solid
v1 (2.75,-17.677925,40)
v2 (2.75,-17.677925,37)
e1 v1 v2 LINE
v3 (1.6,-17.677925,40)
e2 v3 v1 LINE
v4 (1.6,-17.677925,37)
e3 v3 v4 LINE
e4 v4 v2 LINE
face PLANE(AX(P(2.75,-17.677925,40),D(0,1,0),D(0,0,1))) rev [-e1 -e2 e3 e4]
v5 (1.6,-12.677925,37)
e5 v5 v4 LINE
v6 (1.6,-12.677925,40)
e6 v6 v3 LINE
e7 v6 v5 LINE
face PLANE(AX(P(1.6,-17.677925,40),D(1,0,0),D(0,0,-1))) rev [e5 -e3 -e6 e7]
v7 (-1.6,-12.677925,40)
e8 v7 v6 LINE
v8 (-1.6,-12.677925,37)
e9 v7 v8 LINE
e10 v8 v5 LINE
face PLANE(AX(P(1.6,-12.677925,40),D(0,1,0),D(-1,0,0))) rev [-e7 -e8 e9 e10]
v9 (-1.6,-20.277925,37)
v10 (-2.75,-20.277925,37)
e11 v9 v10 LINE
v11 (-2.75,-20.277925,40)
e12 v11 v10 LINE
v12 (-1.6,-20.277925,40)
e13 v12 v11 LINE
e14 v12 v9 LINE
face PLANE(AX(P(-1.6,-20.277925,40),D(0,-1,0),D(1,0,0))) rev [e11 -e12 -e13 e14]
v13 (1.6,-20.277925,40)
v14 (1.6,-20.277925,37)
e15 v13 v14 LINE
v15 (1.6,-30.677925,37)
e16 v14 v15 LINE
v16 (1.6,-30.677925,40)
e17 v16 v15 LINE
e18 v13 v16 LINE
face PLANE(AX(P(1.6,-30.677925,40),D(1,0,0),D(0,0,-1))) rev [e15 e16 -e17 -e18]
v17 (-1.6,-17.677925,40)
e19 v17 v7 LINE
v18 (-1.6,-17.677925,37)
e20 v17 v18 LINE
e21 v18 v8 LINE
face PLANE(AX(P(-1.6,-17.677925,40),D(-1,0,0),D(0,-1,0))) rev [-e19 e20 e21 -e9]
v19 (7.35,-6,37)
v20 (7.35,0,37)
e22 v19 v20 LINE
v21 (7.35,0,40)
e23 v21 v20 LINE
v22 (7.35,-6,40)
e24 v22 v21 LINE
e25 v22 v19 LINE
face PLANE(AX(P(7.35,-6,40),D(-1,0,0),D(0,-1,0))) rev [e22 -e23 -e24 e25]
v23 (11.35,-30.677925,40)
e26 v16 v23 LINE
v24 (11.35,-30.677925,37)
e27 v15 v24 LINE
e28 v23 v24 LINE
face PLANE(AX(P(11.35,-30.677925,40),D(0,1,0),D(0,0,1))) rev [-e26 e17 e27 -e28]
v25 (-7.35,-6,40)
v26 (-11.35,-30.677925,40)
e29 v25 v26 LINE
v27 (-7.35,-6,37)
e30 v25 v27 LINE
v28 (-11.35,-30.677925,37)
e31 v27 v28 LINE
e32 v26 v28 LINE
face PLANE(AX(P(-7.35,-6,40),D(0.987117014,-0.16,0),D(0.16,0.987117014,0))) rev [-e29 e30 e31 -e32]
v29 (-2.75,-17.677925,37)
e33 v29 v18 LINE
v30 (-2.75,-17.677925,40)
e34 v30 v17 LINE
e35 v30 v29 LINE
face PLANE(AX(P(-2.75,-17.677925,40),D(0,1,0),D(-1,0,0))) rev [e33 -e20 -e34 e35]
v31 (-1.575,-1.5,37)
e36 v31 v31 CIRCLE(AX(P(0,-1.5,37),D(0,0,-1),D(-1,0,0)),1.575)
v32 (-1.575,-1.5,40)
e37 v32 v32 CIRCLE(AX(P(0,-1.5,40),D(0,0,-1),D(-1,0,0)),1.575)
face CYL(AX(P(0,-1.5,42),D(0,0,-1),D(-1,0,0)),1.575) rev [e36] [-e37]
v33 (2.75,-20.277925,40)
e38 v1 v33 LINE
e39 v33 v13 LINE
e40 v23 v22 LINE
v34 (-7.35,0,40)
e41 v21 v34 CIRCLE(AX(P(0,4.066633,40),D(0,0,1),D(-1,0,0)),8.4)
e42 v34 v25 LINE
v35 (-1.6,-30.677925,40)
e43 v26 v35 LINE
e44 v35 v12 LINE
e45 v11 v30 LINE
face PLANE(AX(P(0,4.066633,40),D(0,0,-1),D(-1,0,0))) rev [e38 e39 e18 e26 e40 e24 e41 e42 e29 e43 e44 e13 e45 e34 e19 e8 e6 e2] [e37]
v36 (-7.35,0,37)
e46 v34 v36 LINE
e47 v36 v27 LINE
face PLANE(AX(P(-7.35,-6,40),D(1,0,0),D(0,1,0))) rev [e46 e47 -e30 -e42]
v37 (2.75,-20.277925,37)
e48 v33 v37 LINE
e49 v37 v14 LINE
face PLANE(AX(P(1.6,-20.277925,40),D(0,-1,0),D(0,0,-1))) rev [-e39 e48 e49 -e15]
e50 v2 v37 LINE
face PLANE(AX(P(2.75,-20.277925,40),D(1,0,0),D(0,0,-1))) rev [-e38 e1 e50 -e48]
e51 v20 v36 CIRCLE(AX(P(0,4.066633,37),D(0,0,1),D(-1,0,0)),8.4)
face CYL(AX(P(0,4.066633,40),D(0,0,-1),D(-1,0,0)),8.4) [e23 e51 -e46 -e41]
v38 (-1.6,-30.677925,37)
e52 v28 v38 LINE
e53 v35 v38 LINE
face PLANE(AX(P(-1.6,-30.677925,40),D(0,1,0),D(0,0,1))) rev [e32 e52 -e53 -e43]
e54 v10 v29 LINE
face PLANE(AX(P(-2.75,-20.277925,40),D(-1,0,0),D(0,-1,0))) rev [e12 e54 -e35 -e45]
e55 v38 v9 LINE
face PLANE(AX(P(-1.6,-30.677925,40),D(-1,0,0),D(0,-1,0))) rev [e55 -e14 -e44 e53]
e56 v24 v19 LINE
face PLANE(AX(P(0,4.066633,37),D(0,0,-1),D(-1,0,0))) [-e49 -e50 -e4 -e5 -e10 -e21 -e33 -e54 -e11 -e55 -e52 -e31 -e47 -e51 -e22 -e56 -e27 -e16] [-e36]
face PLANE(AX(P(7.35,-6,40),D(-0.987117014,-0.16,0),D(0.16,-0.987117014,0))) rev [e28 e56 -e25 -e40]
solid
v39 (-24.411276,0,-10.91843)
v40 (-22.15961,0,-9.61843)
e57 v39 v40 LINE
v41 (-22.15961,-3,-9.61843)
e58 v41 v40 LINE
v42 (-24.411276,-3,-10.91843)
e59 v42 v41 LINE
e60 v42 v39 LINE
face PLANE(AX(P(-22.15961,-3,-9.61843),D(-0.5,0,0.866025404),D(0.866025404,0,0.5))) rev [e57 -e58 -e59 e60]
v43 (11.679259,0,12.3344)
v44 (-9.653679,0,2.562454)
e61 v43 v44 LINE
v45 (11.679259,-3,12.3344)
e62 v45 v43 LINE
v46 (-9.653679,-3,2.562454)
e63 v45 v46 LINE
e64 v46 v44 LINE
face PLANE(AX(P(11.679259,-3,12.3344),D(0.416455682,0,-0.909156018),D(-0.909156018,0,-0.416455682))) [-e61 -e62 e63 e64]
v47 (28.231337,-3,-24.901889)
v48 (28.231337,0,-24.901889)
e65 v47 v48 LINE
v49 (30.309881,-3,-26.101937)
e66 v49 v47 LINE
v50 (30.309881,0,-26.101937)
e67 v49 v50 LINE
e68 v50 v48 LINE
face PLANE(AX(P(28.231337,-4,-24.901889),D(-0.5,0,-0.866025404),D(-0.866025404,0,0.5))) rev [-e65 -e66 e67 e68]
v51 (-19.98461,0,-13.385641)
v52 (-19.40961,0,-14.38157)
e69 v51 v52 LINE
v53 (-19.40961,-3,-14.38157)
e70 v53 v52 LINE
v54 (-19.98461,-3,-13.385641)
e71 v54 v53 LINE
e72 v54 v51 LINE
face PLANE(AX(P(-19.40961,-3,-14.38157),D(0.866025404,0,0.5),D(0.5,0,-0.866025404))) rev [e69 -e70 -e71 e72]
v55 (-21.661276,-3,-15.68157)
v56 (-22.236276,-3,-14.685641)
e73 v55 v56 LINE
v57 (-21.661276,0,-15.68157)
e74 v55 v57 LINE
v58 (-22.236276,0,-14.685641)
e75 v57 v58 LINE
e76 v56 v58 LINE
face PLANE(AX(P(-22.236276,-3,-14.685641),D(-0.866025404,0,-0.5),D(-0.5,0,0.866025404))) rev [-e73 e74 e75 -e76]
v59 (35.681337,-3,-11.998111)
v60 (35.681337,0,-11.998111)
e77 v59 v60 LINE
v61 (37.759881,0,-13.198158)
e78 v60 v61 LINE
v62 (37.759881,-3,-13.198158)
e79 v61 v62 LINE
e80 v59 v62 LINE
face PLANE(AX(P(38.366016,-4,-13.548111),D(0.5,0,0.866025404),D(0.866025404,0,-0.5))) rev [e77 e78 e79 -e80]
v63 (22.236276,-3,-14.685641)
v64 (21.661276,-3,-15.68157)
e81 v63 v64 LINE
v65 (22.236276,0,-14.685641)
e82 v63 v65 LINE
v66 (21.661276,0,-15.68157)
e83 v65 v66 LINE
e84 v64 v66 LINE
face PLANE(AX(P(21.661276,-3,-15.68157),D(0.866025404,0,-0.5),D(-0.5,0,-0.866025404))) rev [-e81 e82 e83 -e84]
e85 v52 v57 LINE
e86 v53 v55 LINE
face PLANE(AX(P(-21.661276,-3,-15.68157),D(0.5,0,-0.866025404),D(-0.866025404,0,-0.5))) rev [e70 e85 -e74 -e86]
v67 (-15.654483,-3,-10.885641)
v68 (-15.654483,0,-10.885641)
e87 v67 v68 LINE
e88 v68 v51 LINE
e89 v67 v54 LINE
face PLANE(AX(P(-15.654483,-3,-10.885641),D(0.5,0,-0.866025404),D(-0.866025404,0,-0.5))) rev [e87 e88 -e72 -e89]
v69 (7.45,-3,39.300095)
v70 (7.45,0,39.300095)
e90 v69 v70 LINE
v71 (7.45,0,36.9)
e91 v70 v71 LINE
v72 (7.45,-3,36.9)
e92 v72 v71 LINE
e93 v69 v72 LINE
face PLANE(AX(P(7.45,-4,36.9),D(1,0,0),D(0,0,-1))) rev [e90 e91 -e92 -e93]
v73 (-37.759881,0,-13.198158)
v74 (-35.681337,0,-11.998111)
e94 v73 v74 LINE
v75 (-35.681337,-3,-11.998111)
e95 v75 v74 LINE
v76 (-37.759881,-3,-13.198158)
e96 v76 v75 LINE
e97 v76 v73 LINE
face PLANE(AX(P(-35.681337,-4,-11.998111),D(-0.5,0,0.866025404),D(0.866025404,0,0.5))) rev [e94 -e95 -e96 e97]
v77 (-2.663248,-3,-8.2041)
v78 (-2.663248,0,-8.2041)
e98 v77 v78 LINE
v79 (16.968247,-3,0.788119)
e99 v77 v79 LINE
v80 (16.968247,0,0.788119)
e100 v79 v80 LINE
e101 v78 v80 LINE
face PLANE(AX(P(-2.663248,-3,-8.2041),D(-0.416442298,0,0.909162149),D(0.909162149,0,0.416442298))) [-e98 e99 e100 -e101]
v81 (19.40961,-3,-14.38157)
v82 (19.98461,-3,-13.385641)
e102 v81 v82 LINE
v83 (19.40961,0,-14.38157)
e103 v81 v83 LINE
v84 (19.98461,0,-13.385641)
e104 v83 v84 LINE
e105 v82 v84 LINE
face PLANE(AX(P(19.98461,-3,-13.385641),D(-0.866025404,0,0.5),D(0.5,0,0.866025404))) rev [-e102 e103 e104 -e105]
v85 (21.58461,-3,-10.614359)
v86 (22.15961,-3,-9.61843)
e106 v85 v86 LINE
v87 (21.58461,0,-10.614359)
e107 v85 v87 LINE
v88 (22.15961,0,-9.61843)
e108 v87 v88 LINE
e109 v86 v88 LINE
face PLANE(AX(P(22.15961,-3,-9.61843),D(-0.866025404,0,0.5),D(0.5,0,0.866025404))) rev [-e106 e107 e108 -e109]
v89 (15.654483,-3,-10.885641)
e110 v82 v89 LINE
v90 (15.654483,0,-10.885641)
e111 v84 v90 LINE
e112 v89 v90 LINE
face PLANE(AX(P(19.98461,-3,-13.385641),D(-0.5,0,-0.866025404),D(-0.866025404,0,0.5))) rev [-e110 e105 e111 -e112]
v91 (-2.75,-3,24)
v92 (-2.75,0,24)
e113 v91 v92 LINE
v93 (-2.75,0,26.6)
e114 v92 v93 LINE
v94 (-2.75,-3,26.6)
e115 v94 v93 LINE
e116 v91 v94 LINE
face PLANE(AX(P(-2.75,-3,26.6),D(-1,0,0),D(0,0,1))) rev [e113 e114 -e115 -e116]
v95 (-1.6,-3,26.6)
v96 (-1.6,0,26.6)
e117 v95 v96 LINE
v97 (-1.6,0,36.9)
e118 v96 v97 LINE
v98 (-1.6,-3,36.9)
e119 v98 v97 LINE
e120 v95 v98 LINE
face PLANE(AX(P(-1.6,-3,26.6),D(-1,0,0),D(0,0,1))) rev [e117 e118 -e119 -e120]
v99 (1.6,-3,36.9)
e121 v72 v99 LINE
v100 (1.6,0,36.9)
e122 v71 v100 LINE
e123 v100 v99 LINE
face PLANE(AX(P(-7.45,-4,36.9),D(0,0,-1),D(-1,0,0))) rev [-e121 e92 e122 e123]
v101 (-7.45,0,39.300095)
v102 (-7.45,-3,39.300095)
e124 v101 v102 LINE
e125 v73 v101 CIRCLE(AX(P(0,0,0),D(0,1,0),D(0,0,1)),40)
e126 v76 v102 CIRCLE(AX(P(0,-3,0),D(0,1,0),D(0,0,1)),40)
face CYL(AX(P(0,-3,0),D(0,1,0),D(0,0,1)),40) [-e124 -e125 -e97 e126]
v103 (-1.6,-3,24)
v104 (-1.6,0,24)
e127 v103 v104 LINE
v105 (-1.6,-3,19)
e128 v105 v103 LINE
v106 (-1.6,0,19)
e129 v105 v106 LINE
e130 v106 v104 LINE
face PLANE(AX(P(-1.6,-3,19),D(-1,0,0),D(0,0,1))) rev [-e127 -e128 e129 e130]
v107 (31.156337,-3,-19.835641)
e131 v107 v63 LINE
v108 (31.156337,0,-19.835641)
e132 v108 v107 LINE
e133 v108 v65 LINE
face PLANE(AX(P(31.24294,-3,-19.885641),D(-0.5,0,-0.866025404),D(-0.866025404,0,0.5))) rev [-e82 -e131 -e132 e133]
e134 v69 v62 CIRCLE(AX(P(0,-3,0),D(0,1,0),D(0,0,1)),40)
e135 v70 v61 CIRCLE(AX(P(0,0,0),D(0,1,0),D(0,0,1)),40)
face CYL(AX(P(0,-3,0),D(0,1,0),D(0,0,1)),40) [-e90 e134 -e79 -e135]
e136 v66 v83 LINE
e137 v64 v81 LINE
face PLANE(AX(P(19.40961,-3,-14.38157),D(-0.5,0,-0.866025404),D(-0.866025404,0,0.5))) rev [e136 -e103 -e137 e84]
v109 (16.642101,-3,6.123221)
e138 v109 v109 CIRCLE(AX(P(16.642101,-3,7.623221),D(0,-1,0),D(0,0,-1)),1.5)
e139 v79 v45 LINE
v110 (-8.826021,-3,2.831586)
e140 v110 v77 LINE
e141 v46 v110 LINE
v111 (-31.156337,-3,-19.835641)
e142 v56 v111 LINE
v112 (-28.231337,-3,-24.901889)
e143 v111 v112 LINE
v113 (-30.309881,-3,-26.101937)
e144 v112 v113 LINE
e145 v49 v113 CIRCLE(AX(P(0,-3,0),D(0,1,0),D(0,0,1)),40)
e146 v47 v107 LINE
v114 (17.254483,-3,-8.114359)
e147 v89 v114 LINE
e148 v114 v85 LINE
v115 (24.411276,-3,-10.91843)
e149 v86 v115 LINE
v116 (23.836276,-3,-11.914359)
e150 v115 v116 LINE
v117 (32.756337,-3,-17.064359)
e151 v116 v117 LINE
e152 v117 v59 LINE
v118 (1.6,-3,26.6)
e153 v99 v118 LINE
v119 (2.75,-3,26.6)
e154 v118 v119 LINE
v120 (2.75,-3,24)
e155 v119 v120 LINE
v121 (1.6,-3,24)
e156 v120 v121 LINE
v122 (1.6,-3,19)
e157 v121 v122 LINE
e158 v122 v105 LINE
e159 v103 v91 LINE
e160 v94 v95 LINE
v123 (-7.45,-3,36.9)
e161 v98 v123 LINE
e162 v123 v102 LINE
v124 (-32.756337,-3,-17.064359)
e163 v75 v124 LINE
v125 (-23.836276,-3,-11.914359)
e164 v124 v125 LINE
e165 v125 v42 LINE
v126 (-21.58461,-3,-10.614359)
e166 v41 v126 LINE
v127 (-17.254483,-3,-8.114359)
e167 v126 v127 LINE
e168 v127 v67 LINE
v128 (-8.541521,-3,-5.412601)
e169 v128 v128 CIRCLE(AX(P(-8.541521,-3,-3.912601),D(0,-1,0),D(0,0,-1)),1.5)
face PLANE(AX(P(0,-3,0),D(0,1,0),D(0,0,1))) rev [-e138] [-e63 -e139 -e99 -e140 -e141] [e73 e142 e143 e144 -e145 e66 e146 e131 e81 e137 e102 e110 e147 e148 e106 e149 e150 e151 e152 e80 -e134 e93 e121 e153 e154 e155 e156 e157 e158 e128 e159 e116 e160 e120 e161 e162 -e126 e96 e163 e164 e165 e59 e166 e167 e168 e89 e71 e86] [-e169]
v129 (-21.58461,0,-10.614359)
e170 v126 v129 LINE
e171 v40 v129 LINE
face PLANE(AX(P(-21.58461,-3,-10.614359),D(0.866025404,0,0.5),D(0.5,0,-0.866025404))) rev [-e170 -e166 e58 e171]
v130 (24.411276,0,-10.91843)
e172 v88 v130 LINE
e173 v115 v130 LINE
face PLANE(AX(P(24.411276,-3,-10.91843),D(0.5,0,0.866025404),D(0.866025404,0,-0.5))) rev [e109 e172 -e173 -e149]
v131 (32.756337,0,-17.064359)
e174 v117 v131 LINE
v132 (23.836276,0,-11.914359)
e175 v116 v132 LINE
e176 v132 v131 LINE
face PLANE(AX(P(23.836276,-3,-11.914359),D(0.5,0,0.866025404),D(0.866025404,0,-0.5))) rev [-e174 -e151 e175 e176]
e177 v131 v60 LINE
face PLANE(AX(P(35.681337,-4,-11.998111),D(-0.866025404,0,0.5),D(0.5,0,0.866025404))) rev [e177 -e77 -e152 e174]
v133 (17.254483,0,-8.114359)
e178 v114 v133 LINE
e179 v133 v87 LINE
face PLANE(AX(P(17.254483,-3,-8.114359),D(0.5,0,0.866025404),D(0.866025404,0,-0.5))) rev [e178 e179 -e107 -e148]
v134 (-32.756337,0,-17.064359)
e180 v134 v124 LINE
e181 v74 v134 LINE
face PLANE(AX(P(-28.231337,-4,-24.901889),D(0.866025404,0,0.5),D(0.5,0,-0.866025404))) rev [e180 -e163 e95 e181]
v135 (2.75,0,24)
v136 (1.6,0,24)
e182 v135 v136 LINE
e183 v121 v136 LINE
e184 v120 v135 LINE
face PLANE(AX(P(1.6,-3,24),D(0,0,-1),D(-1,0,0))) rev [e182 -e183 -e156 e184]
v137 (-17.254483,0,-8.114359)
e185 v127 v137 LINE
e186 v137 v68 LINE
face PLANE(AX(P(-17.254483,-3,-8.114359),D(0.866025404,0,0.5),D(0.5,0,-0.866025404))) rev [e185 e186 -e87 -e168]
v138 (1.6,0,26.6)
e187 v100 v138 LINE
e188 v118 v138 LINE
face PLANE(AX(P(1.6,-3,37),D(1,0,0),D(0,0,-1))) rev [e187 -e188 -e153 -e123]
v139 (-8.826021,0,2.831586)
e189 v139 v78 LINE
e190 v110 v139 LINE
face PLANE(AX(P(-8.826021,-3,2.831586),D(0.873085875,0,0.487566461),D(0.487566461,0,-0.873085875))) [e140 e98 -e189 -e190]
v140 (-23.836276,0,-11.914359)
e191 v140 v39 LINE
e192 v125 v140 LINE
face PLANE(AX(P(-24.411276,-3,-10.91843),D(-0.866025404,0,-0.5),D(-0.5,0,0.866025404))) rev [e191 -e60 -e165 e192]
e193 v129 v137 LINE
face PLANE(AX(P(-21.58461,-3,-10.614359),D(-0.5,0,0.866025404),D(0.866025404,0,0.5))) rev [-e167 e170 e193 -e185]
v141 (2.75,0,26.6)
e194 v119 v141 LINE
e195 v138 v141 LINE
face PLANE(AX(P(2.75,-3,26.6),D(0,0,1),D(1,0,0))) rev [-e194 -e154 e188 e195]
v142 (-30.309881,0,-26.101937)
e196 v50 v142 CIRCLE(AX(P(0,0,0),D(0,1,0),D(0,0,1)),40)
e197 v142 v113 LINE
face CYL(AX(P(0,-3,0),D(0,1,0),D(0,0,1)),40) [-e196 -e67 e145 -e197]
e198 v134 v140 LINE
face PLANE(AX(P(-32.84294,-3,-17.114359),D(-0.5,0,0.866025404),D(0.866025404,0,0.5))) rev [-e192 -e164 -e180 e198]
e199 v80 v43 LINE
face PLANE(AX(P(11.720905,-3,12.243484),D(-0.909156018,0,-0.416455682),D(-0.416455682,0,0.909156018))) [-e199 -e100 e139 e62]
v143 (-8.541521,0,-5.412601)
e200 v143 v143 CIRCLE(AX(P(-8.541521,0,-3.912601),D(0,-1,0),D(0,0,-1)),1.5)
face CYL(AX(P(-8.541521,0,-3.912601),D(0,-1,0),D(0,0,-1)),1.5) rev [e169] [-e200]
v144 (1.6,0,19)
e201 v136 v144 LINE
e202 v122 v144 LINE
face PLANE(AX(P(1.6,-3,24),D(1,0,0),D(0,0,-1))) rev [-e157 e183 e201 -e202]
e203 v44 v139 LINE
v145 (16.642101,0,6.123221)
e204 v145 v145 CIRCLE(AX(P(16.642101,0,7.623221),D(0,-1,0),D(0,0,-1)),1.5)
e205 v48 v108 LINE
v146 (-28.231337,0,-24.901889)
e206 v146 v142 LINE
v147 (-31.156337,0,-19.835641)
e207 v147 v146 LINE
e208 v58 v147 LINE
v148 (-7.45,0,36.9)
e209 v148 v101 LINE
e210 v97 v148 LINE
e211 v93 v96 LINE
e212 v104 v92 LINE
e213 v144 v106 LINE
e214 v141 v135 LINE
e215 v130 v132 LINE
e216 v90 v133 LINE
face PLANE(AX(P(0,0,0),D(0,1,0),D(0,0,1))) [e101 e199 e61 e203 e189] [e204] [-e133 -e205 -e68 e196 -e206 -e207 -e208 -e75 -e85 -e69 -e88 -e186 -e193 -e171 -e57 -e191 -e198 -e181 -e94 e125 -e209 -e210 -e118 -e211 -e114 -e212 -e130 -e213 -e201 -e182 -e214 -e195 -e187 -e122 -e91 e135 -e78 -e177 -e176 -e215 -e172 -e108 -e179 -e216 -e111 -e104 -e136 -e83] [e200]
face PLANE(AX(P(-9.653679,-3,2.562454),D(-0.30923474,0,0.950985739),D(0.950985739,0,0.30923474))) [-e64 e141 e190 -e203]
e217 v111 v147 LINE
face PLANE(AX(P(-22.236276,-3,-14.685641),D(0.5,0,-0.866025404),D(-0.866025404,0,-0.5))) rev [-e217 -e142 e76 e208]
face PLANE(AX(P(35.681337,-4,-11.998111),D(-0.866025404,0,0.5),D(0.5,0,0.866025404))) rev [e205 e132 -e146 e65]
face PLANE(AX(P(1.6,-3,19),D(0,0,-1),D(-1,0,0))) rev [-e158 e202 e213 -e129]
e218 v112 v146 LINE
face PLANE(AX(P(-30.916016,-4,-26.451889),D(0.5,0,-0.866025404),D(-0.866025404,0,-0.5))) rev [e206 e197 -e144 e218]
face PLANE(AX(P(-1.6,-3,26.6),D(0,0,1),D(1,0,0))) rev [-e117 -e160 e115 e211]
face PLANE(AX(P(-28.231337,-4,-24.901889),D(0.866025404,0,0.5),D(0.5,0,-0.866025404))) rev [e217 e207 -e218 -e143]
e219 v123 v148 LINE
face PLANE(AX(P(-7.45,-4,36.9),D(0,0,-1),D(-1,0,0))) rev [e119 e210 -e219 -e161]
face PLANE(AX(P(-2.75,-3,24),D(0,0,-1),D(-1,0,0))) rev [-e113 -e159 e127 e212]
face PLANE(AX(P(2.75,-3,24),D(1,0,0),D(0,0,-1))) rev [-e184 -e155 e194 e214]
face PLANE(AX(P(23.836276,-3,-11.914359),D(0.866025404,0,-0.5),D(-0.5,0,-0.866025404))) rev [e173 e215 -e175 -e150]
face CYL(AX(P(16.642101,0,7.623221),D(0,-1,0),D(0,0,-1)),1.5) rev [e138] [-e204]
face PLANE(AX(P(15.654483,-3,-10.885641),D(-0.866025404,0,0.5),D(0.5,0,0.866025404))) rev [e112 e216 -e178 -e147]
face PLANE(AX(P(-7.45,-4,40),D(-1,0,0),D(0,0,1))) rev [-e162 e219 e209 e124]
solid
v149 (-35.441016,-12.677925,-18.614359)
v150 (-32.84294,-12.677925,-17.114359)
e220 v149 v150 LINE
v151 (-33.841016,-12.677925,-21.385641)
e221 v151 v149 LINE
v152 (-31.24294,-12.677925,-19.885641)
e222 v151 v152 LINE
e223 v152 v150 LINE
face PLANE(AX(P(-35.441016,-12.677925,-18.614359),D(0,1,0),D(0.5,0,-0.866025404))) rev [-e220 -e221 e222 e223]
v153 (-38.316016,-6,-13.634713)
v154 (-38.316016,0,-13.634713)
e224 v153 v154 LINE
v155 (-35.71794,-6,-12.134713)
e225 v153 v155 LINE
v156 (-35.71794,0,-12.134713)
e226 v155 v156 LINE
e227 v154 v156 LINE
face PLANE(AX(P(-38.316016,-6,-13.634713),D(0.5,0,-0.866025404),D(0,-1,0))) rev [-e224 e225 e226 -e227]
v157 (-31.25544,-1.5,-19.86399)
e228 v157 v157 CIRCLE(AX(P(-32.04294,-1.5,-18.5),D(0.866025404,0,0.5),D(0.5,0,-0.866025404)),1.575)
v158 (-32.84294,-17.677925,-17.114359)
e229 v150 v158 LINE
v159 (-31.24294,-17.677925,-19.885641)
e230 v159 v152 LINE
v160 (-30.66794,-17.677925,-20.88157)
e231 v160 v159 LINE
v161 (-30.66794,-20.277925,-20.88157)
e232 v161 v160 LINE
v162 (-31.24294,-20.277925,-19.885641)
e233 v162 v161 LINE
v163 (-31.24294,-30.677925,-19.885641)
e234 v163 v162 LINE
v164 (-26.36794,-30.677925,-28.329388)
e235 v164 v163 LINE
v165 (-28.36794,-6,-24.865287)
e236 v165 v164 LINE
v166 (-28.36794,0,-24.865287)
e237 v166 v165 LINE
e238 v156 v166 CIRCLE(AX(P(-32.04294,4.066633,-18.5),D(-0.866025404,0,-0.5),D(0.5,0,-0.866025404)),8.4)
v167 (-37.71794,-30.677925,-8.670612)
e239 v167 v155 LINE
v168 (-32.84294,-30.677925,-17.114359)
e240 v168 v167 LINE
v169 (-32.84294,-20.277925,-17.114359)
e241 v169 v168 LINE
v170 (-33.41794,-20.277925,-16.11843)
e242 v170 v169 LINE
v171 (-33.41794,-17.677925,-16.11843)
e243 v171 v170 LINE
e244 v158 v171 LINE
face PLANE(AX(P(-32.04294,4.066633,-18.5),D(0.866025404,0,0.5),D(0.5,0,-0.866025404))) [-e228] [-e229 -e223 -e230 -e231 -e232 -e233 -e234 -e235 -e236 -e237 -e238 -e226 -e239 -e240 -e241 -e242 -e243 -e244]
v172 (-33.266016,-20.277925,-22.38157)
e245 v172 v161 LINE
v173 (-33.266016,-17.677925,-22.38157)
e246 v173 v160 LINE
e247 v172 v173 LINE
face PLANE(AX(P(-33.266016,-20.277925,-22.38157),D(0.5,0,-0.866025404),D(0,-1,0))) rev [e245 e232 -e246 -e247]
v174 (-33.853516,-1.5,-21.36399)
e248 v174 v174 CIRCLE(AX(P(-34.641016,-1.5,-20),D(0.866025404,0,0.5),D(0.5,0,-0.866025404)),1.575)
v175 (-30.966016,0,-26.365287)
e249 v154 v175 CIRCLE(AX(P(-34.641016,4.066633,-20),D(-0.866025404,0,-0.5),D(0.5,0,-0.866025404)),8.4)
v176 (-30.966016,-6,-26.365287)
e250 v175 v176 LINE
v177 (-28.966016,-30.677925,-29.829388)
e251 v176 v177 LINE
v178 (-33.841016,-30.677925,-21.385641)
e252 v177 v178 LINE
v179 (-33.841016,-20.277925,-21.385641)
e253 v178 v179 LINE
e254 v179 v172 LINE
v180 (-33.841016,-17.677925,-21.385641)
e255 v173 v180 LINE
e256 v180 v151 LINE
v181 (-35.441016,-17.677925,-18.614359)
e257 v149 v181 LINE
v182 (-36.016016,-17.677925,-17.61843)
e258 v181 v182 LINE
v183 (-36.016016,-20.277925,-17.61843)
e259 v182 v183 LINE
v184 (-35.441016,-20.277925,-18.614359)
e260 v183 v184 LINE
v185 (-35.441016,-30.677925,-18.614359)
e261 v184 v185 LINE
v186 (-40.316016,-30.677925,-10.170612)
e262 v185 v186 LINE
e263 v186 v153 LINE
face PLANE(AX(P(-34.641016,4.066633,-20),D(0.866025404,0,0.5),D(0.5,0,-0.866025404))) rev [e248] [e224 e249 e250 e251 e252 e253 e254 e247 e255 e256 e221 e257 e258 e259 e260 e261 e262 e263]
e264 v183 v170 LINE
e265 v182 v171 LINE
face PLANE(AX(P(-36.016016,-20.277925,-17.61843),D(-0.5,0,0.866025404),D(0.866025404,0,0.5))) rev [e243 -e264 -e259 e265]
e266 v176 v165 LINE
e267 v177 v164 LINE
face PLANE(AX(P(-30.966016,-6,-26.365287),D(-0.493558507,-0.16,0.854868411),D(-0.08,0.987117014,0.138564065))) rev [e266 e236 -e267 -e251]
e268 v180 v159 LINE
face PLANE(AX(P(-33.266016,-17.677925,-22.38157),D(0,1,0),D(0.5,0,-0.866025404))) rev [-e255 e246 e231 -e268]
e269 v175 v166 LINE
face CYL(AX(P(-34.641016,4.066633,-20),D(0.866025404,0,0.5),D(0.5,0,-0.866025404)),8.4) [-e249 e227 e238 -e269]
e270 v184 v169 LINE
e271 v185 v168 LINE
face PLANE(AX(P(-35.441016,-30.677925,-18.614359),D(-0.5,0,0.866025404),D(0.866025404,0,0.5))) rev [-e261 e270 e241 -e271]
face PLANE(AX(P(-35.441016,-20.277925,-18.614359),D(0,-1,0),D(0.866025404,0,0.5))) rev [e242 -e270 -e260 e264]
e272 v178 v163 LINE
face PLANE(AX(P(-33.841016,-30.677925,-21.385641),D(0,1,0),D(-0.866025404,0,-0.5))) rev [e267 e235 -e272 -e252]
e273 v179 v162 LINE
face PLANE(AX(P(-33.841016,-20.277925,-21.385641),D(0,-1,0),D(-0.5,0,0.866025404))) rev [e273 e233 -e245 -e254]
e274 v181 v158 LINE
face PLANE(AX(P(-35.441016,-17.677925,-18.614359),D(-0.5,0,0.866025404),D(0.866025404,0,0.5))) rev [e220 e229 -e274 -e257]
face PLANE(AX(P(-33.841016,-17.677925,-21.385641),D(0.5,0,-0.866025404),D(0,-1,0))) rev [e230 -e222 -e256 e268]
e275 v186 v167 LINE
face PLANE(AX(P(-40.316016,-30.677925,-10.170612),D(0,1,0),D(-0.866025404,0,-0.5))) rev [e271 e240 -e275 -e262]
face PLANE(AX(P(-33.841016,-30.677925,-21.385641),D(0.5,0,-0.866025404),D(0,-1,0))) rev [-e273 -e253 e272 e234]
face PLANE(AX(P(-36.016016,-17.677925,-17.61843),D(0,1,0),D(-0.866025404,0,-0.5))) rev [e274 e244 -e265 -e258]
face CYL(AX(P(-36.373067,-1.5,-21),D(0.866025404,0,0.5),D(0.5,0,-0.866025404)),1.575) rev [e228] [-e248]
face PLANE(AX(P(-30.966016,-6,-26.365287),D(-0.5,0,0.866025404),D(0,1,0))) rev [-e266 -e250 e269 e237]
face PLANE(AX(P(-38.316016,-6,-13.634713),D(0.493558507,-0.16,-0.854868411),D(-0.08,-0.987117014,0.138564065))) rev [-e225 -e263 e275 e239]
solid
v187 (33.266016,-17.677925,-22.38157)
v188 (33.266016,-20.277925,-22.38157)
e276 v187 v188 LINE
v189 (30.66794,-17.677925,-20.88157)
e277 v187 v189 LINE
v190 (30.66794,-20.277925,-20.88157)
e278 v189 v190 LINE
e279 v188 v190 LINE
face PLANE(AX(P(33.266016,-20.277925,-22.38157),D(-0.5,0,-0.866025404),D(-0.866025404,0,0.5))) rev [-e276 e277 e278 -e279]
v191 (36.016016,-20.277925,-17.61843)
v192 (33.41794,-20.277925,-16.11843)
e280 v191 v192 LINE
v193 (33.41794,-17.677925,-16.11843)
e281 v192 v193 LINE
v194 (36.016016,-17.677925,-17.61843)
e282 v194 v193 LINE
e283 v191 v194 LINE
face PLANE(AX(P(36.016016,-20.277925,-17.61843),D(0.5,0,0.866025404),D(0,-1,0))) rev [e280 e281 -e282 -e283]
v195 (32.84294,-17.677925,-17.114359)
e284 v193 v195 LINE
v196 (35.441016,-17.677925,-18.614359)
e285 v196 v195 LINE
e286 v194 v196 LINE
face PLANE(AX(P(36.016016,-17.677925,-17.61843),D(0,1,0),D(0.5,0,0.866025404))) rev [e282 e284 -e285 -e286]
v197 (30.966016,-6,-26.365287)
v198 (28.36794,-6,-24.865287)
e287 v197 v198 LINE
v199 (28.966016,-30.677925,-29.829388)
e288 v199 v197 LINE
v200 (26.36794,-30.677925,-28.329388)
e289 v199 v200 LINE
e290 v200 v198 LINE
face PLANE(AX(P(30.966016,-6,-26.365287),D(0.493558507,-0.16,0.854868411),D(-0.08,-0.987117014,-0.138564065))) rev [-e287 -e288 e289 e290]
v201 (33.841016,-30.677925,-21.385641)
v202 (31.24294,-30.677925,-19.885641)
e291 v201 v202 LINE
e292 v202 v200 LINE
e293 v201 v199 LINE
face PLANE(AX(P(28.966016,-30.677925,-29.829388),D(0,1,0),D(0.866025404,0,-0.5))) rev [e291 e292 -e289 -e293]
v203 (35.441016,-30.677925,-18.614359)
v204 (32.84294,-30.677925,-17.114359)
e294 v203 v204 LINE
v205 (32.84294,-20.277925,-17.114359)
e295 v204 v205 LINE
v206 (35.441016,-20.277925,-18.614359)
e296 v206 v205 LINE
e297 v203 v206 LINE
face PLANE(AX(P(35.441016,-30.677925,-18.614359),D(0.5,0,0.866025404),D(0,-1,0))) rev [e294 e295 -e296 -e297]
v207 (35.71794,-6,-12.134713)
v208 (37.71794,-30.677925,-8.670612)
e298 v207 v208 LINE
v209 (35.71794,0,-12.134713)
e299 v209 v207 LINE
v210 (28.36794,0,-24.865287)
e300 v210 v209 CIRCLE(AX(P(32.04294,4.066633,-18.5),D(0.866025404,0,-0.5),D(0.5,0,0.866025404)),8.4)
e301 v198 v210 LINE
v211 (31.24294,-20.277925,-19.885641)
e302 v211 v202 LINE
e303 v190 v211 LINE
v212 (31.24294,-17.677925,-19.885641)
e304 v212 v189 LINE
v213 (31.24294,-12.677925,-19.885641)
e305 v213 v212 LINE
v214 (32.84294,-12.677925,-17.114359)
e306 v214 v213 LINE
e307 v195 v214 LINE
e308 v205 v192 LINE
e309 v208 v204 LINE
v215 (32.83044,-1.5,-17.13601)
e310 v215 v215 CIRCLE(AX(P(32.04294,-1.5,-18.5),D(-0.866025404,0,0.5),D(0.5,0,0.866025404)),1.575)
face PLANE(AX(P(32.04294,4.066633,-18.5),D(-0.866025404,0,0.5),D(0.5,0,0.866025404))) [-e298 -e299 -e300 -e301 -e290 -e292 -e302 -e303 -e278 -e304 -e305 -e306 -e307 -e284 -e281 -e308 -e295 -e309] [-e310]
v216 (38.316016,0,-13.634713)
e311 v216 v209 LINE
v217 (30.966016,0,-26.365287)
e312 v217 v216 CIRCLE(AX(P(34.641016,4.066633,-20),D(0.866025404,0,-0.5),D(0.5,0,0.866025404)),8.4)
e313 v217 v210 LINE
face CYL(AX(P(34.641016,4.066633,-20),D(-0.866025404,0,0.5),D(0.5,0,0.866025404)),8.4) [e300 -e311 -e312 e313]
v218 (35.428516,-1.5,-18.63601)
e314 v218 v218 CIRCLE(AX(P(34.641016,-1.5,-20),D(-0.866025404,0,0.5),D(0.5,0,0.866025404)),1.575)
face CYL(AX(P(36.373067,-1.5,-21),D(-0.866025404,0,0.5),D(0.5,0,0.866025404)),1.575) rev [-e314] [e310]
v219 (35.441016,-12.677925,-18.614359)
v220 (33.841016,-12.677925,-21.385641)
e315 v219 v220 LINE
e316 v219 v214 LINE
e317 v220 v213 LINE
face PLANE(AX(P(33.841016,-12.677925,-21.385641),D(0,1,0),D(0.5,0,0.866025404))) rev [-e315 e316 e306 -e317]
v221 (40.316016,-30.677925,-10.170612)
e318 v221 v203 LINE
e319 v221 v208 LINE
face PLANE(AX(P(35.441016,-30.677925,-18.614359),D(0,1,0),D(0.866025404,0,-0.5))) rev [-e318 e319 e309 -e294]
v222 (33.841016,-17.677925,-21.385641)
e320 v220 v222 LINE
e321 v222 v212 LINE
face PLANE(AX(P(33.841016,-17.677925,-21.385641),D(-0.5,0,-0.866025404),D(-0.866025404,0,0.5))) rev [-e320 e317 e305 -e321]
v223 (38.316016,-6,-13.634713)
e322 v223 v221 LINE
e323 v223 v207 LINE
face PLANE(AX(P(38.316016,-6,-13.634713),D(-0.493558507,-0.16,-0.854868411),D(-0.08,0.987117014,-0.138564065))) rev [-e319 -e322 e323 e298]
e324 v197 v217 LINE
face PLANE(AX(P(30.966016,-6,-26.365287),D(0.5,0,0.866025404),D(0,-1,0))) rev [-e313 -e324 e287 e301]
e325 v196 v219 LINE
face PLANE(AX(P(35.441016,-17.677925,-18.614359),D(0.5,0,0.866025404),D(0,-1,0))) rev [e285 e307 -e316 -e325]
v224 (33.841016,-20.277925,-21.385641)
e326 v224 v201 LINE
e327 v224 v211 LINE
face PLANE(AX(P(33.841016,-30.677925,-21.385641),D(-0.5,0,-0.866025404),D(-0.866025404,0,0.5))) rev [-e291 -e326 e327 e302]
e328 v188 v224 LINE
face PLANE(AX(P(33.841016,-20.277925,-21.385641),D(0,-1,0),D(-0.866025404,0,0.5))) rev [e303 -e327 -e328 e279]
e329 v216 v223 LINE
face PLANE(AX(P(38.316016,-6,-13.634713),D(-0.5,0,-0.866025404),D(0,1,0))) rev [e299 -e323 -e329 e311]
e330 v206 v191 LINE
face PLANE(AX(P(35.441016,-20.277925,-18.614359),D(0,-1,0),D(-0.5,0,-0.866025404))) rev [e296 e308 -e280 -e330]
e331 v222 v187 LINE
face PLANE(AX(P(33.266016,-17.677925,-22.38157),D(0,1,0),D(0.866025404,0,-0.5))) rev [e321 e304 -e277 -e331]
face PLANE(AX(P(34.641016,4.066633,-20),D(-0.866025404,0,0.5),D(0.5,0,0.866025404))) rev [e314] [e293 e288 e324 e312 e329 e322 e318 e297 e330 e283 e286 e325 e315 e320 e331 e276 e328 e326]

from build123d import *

# Parameters (mm, degrees)
SKETCH1_R          = 40
BASE_FLANGE1_DEPTH = 3
SKETCH9_R          = 1.5
CUT_EXTRUDE2_DEPTH = 3
BASE_FLANGE2_DEPTH = 3
CIRPATTERN3_COUNT  = 3
CUT_EXTRUDE5_DEPTH = 4
CUT_EXTRUDE6_DEPTH = 3
SKETCH41_R         = 1.575
CUT_EXTRUDE7_DEPTH = 5
CIRPATTERN4_COUNT  = 3
CUT_EXTRUDE8_DEPTH = 5
SKETCH43_R         = 1.575
CUT_EXTRUDE9_DEPTH = 5


# Sheet-metal steps are written as plain solids
with BuildPart() as part:
    # Sketch1 → Base-Flange1 (new body)
    with BuildSketch(Plane(origin=(0, 0, 0), x_dir=(1, 0, 0), z_dir=(0, 1, 0))):
        with Locations(Location((0, 0, 0), (0, 0, 270))):
            Circle(SKETCH1_R)
        Polygon((16.510145392, -1.788190184), (16.926601074, -0.879034167), (16.968246643, -0.788118565), (-2.663247704, 8.204099852), (-2.712004351, 8.116791265), (-8.826020957, -2.831585964), (-9.653679096, -2.56245401), (11.679259475, -12.33439999), (11.720905044, -12.243484388), align=None, mode=Mode.SUBTRACT)
    extrude(amount=-BASE_FLANGE1_DEPTH)

    # Sketch9 → Cut-Extrude2 (cut)
    with BuildSketch(Plane.XZ.offset(3)):
        with Locations(Location((-8.541520786, -3.912601137, 0), (0, 0, 270))):
            Circle(SKETCH9_R)
        with Locations(Location((16.642100904, 7.623221268, 0), (0, 0, 270))):
            Circle(SKETCH9_R)
    extrude(amount=-CUT_EXTRUDE2_DEPTH, mode=Mode.SUBTRACT)

    # Sketch25 → Cut-Extrude5 (cut)
    with BuildSketch(Plane(origin=(0, 0, 0), x_dir=(1, 0, 0), z_dir=(0, 1, 0))):
        Polygon((38.316016151, 13.634713282), (35.71793994, 12.134713282), (28.36793994, 24.865286718), (30.966016151, 26.365286718), (30.916016151, 26.451889258), (28.2313374, 24.901889258), (35.6813374, 11.998110742), (38.366016151, 13.548110742), align=None)
        Polygon((-7.35, -40), (-7.35, -37), (7.35, -37), (7.35, -40), (7.45, -40), (7.45, -36.9), (-7.45, -36.9), (-7.45, -40), align=None)
        Polygon((-30.966016151, 26.365286718), (-28.36793994, 24.865286718), (-35.71793994, 12.134713282), (-38.316016151, 13.634713282), (-38.366016151, 13.548110742), (-35.6813374, 11.998110742), (-28.2313374, 24.901889258), (-30.916016151, 26.451889258), align=None)
    extrude(amount=-CUT_EXTRUDE5_DEPTH, mode=Mode.SUBTRACT)


with BuildPart() as body_2:
    # Sketch10 → Base-Flange2 (new body)
    with BuildSketch(Plane.XY.offset(37)):
        with BuildLine():
            Line((7.35, -6), (11.35, -30.677925359))
            Line((11.35, -30.677925359), (1.6, -30.677925359))
            Line((1.6, -30.677925359), (1.6, -20.277925359))
            Line((1.6, -20.277925359), (2.75, -20.277925359))
            Line((2.75, -20.277925359), (2.75, -17.677925359))
            Line((2.75, -17.677925359), (1.6, -17.677925359))
            Line((1.6, -17.677925359), (1.6, -12.677925359))
            Line((1.6, -12.677925359), (-1.6, -12.677925359))
            Line((-1.6, -12.677925359), (-1.6, -17.677925359))
            Line((-1.6, -17.677925359), (-2.75, -17.677925359))
            Line((-2.75, -17.677925359), (-2.75, -20.277925359))
            Line((-2.75, -20.277925359), (-1.6, -20.277925359))
            Line((-1.6, -20.277925359), (-1.6, -30.677925359))
            Line((-1.6, -30.677925359), (-11.35, -30.677925359))
            Line((-11.35, -30.677925359), (-7.35, -6))
            Line((-7.35, -6), (-7.35, 0))
            ThreePointArc((-7.35, 0), (0, 12.466632514), (7.35, 0))
            Line((7.35, 0), (7.35, -6))
        make_face()
    extrude(amount=BASE_FLANGE2_DEPTH)


with BuildPart() as cirpattern3_1:
    # CirPattern3: pattern copy
    add(body_2.part.rotate(Axis((0, 0, 0), (0, 1, 0)), 1 * 360 / CIRPATTERN3_COUNT))


with BuildPart() as cirpattern3_2:
    # CirPattern3: pattern copy
    add(body_2.part.rotate(Axis((0, 0, 0), (0, 1, 0)), 2 * 360 / CIRPATTERN3_COUNT))


with BuildPart() as cut_extrude5_piece_1:
    # of the separate pieces the step leaves, piece 1, a body of its own (cut_extrude5_pieces)
    add(part.part.solids().sort_by_distance((7.45, 0, 39.30009542))[0])

    # Sketch40 → Cut-Extrude6 (cut)
    with BuildSketch(Plane(origin=(0, 0, 0), x_dir=(1, 0, 0), z_dir=(0, 1, 0))):
        Polygon((0, -37), (1.6, -37), (1.6, -26.6), (2.75, -26.6), (2.75, -24), (1.6, -24), (1.6, -19), (-1.6, -19), (-1.6, -24), (-2.75, -24), (-2.75, -26.6), (-1.6, -26.6), (-1.6, -37), align=None)
    cut_extrude6 = extrude(amount=-CUT_EXTRUDE6_DEPTH, mode=Mode.SUBTRACT)

    # CirPattern4: Cut-Extrude6 ×3 about axis
    cirpattern4_axis = Axis((0, 0, 0), (0, 1, 0))
    for i in range(1, CIRPATTERN4_COUNT):
        add(cut_extrude6.rotate(cirpattern4_axis, i * 360 / CIRPATTERN4_COUNT), mode=Mode.SUBTRACT)


with BuildPart() as cut_extrude5_piece_2:
    # of the separate pieces the step leaves, piece 2, a body of its own (cut_extrude5_pieces)
    add(part.part.solids().sort_by_distance((-30.3761839, 0, -26.024746909))[0])


with BuildPart() as cut_extrude5_piece_3:
    # of the separate pieces the step leaves, piece 3, a body of its own (cut_extrude5_pieces)
    add(part.part.solids().sort_by_distance((37.7261839, 0, -13.294173473))[0])


with BuildPart() as cut_extrude5_piece_4:
    # of the separate pieces the step leaves, piece 4, a body of its own (cut_extrude5_pieces)
    add(part.part.solids().sort_by_distance((7.35, 0, 39.318920382))[0])


with BuildPart() as body_2_1:
    add(body_2.part)

    # Combine1: union Cut-Extrude5 piece 4
    add(cut_extrude5_piece_4.part)

    # Sketch41 → Cut-Extrude7 (cut)
    with BuildSketch(Plane(origin=(0, 0, 37), x_dir=(-1, 0, 0), z_dir=(0, 0, -1))):
        with Locations((0, -1.5)):
            Circle(SKETCH41_R)
    extrude(amount=-CUT_EXTRUDE7_DEPTH, mode=Mode.SUBTRACT)


with BuildPart() as cirpattern3_1_1:
    add(cirpattern3_1.part)

    # Combine2: union Cut-Extrude5 piece 3
    add(cut_extrude5_piece_3.part)

    # Sketch43 → Cut-Extrude9 (cut)
    with BuildSketch(Plane(origin=(32.04293994, 0, -18.5), x_dir=(0.500000000000004, 0, 0.8660254037844364), z_dir=(-0.8660254037844365, 0, 0.500000000000004))):
        with Locations((0, -1.5)):
            Circle(SKETCH43_R)
    extrude(amount=-CUT_EXTRUDE9_DEPTH, mode=Mode.SUBTRACT)


with BuildPart() as cirpattern3_2_1:
    add(cirpattern3_2.part)

    # Combine3: union Cut-Extrude5 piece 2
    add(cut_extrude5_piece_2.part)

    # Sketch42 → Cut-Extrude8 (cut)
    with BuildSketch(Plane(origin=(-32.04293994, 0, -18.5), x_dir=(0.49999999999999195, 0, -0.8660254037844434), z_dir=(0.8660254037844434, 0, 0.49999999999999195))):
        with BuildLine():
            ThreePointArc((1.575, -1.5), (1.464638731, -0.920812305), (1.149021097, -0.422792722))
            Line((1.149021097, -0.422792722), (-1.149021097, -2.577207278))
            ThreePointArc((-1.149021097, -2.577207278), (0.579187695, -2.964638731), (1.575, -1.5))
        make_face()
        with BuildLine():
            Line((-1.149021097, -2.577207278), (1.149021097, -0.422792722))
            ThreePointArc((1.149021097, -0.422792722), (-1.077207278, -0.350978903), (-1.149021097, -2.577207278))
        make_face()
    extrude(amount=-CUT_EXTRUDE8_DEPTH, mode=Mode.SUBTRACT)


solid = Compound([cut_extrude5_piece_1.part, body_2_1.part, cirpattern3_1_1.part, cirpattern3_2_1.part])
